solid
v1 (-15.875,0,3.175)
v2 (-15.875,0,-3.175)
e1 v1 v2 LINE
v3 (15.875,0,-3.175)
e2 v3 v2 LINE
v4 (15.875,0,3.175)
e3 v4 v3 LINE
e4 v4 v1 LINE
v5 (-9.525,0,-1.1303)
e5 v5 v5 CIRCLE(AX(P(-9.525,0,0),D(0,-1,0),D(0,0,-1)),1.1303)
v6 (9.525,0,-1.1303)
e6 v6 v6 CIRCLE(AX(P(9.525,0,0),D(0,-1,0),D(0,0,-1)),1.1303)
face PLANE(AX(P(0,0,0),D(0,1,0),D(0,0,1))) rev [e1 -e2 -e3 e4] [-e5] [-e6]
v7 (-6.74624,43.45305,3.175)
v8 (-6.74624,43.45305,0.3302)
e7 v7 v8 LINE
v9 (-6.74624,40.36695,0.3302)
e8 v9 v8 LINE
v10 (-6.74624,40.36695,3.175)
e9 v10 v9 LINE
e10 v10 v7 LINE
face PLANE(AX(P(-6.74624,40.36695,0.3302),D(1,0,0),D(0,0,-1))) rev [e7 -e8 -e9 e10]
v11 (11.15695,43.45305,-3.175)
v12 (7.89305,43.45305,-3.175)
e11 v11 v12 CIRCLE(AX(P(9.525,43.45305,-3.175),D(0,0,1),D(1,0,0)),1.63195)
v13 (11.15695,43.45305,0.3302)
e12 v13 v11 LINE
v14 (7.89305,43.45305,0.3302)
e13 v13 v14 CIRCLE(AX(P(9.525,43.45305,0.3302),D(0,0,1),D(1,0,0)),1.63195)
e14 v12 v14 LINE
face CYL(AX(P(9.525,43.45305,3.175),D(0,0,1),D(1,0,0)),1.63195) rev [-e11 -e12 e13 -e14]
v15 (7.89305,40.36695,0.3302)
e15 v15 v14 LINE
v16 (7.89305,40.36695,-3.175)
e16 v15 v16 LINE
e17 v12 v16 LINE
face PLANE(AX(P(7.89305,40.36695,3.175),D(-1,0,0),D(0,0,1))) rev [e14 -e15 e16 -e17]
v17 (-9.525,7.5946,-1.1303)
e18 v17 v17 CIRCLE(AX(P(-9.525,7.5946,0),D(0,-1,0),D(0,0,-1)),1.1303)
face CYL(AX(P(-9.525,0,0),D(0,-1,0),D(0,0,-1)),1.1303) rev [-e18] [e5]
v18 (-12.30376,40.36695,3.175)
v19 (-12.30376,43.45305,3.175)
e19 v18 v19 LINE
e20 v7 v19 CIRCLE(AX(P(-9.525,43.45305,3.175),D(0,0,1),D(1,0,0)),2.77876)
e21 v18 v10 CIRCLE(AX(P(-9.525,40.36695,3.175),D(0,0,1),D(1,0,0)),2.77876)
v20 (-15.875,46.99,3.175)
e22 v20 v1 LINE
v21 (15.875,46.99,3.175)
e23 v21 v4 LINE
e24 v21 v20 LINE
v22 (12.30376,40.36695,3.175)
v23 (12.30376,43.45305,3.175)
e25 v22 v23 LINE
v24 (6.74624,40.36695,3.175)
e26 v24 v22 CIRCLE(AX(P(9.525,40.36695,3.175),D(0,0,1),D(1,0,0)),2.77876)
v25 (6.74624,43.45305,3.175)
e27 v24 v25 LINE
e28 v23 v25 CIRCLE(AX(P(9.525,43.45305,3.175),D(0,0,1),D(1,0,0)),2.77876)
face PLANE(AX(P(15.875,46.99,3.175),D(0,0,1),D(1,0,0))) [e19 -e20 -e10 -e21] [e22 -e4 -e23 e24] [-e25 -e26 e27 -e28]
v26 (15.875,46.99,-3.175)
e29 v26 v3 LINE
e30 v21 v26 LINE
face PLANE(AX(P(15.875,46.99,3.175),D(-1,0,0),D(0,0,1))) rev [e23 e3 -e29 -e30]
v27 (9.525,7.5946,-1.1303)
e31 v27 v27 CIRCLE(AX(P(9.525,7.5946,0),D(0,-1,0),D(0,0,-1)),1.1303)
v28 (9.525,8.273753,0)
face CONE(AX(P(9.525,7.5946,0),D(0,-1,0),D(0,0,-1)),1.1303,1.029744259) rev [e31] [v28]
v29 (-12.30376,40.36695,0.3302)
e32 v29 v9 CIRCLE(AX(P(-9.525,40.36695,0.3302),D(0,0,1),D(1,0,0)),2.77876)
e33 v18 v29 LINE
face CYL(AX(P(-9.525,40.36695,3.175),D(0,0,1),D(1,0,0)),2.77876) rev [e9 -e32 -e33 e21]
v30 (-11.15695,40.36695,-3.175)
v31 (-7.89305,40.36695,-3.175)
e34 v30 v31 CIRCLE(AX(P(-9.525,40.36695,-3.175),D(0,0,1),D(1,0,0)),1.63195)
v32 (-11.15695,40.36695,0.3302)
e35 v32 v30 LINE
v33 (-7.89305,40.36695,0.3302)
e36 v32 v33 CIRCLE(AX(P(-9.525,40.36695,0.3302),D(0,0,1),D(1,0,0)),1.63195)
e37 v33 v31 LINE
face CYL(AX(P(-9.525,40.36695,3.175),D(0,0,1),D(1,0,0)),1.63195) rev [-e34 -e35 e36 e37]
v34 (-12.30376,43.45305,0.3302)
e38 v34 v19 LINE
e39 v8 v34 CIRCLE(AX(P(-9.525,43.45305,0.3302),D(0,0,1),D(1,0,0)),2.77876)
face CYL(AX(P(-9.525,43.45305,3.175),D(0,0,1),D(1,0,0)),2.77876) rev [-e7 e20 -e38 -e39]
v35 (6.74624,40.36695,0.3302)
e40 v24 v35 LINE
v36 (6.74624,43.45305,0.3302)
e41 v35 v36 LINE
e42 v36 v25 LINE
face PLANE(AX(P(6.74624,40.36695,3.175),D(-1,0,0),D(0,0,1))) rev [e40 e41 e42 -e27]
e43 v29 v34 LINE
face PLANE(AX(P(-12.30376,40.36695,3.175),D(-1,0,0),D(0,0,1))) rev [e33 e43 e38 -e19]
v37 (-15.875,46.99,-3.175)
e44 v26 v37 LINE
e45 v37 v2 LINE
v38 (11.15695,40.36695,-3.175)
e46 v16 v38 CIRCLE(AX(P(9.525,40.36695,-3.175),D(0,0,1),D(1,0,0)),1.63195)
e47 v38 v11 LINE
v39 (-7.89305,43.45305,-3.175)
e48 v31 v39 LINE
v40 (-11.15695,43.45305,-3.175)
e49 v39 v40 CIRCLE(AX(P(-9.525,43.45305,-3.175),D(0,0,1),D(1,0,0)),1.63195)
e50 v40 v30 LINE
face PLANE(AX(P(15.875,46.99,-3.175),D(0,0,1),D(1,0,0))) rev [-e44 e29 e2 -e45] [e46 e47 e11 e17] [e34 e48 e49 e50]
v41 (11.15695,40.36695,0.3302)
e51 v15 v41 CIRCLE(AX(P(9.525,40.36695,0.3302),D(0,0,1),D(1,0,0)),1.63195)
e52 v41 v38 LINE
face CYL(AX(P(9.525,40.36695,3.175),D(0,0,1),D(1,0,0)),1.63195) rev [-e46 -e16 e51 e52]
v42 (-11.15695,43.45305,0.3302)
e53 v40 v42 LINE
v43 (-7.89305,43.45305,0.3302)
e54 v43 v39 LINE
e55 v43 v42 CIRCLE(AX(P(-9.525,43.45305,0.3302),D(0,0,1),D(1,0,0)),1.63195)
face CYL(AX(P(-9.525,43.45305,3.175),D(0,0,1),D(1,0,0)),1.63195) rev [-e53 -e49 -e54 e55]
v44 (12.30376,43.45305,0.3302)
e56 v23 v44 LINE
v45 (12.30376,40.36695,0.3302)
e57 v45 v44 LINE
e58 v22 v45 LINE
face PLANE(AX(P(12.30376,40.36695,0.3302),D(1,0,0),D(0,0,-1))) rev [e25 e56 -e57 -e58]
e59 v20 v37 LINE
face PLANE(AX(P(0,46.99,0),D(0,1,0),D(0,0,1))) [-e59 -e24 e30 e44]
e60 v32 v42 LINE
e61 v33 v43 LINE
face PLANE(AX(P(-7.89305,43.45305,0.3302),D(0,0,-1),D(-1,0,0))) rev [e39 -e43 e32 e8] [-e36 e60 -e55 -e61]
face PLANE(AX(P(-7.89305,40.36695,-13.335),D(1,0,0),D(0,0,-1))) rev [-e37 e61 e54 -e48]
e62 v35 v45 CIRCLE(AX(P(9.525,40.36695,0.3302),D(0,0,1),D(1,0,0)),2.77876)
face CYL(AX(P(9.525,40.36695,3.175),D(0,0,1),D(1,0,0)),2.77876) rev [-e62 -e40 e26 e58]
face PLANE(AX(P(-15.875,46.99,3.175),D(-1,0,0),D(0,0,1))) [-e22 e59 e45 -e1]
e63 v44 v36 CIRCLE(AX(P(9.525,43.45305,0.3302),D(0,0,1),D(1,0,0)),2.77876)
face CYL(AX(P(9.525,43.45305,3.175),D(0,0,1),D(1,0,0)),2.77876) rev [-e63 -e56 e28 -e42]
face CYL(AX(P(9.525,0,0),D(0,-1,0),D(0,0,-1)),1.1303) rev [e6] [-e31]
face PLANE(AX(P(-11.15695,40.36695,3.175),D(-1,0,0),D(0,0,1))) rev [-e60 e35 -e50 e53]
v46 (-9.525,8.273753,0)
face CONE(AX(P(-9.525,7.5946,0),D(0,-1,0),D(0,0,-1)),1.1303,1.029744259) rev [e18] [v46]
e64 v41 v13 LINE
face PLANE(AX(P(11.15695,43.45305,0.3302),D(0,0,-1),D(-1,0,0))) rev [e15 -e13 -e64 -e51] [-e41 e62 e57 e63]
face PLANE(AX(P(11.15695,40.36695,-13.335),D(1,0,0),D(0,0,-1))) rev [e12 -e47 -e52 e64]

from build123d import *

# Parameters (mm, degrees)
SKETCH1_W                                     = 31.75
SKETCH1_H                                     = 6.35
BOSS_EXTRUDE1_DEPTH                           = 46.99
F_4_40_TAPPED_HOLE1_D                         = 2.2606
F_4_40_TAPPED_HOLE1_DEPTH                     = 7.5946
F_4_40_TAPPED_HOLE1_TIP                       = 0.679152758
CBORE_START                                   = 0.3302
CBORE_SLOT_FOR_4_SOCKET_HEAD_CAP_SCREW1_DEPTH = 2.8448
CBORE_START_2                                 = -3.175
CBORE_SLOT_FOR_4_SOCKET_HEAD_CAP_SC_3_DEPTH   = 3.5052


# Read off the part's stored shape, not the designer's step: CBORE SLOT for #4 Socket Head Cap Screw1
with BuildPart() as part:
    # Sketch1 → Boss-Extrude1 (new body)
    with BuildSketch(Plane(origin=(0, 0, 0), x_dir=(1, 0, 0), z_dir=(0, 1, 0))):
        Rectangle(SKETCH1_W, SKETCH1_H)
    extrude(amount=BOSS_EXTRUDE1_DEPTH)

    # #4-40 Tapped Hole1
    with Locations(Plane(origin=(0, 0, 0), x_dir=(-1, 0, 0), z_dir=(0, -1, 0))):
        with Locations((9.525, 0), (-9.525, 0)):
            Hole(F_4_40_TAPPED_HOLE1_D / 2, depth=F_4_40_TAPPED_HOLE1_DEPTH)
            with Locations((0, 0, -(F_4_40_TAPPED_HOLE1_DEPTH + F_4_40_TAPPED_HOLE1_TIP / 2))):  # 118° drill point
                Cone(0, F_4_40_TAPPED_HOLE1_D / 2, F_4_40_TAPPED_HOLE1_TIP, mode=Mode.SUBTRACT)

    # CBORE SLOT for _4 Socket Head Cap Sc 2 → CBORE SLOT for #4 Socket Head Cap Screw1 (cut)
    with BuildSketch(Plane.XY.offset(CBORE_START)):
        with BuildLine():
            Line((-6.74624, 40.36695), (-6.74624, 43.45305))
            ThreePointArc((-6.74624, 43.45305), (-9.525, 46.23181), (-12.30376, 43.45305))
            Line((-12.30376, 43.45305), (-12.30376, 40.36695))
            ThreePointArc((-12.30376, 40.36695), (-9.525, 37.58819), (-6.74624, 40.36695))
        make_face()
        with BuildLine():
            Line((12.30376, 40.36695), (12.30376, 43.45305))
            ThreePointArc((12.30376, 43.45305), (9.525, 46.23181), (6.74624, 43.45305))
            Line((6.74624, 43.45305), (6.74624, 40.36695))
            ThreePointArc((6.74624, 40.36695), (9.525, 37.58819), (12.30376, 40.36695))
        make_face()
    extrude(amount=CBORE_SLOT_FOR_4_SOCKET_HEAD_CAP_SCREW1_DEPTH, mode=Mode.SUBTRACT)

    # CBORE SLOT for _4 Socket Head Cap Sc 3 o → CBORE SLOT for _4 Socket Head Cap Sc 3 (cut)
    with BuildSketch(Plane.XY.offset(CBORE_START_2)):
        with BuildLine():
            ThreePointArc((-7.89305, 43.45305), (-9.525, 45.085), (-11.15695, 43.45305))
            Line((-11.15695, 43.45305), (-11.15695, 40.36695))
            ThreePointArc((-11.15695, 40.36695), (-9.525, 38.735), (-7.89305, 40.36695))
            Line((-7.89305, 40.36695), (-7.89305, 43.45305))
        make_face()
        with BuildLine():
            Line((7.89305, 43.45305), (7.89305, 40.36695))
            ThreePointArc((7.89305, 40.36695), (9.525, 38.735), (11.15695, 40.36695))
            Line((11.15695, 40.36695), (11.15695, 43.45305))
            ThreePointArc((11.15695, 43.45305), (9.525, 45.085), (7.89305, 43.45305))
        make_face()
    extrude(amount=CBORE_SLOT_FOR_4_SOCKET_HEAD_CAP_SC_3_DEPTH, mode=Mode.SUBTRACT)


solid = part.part
